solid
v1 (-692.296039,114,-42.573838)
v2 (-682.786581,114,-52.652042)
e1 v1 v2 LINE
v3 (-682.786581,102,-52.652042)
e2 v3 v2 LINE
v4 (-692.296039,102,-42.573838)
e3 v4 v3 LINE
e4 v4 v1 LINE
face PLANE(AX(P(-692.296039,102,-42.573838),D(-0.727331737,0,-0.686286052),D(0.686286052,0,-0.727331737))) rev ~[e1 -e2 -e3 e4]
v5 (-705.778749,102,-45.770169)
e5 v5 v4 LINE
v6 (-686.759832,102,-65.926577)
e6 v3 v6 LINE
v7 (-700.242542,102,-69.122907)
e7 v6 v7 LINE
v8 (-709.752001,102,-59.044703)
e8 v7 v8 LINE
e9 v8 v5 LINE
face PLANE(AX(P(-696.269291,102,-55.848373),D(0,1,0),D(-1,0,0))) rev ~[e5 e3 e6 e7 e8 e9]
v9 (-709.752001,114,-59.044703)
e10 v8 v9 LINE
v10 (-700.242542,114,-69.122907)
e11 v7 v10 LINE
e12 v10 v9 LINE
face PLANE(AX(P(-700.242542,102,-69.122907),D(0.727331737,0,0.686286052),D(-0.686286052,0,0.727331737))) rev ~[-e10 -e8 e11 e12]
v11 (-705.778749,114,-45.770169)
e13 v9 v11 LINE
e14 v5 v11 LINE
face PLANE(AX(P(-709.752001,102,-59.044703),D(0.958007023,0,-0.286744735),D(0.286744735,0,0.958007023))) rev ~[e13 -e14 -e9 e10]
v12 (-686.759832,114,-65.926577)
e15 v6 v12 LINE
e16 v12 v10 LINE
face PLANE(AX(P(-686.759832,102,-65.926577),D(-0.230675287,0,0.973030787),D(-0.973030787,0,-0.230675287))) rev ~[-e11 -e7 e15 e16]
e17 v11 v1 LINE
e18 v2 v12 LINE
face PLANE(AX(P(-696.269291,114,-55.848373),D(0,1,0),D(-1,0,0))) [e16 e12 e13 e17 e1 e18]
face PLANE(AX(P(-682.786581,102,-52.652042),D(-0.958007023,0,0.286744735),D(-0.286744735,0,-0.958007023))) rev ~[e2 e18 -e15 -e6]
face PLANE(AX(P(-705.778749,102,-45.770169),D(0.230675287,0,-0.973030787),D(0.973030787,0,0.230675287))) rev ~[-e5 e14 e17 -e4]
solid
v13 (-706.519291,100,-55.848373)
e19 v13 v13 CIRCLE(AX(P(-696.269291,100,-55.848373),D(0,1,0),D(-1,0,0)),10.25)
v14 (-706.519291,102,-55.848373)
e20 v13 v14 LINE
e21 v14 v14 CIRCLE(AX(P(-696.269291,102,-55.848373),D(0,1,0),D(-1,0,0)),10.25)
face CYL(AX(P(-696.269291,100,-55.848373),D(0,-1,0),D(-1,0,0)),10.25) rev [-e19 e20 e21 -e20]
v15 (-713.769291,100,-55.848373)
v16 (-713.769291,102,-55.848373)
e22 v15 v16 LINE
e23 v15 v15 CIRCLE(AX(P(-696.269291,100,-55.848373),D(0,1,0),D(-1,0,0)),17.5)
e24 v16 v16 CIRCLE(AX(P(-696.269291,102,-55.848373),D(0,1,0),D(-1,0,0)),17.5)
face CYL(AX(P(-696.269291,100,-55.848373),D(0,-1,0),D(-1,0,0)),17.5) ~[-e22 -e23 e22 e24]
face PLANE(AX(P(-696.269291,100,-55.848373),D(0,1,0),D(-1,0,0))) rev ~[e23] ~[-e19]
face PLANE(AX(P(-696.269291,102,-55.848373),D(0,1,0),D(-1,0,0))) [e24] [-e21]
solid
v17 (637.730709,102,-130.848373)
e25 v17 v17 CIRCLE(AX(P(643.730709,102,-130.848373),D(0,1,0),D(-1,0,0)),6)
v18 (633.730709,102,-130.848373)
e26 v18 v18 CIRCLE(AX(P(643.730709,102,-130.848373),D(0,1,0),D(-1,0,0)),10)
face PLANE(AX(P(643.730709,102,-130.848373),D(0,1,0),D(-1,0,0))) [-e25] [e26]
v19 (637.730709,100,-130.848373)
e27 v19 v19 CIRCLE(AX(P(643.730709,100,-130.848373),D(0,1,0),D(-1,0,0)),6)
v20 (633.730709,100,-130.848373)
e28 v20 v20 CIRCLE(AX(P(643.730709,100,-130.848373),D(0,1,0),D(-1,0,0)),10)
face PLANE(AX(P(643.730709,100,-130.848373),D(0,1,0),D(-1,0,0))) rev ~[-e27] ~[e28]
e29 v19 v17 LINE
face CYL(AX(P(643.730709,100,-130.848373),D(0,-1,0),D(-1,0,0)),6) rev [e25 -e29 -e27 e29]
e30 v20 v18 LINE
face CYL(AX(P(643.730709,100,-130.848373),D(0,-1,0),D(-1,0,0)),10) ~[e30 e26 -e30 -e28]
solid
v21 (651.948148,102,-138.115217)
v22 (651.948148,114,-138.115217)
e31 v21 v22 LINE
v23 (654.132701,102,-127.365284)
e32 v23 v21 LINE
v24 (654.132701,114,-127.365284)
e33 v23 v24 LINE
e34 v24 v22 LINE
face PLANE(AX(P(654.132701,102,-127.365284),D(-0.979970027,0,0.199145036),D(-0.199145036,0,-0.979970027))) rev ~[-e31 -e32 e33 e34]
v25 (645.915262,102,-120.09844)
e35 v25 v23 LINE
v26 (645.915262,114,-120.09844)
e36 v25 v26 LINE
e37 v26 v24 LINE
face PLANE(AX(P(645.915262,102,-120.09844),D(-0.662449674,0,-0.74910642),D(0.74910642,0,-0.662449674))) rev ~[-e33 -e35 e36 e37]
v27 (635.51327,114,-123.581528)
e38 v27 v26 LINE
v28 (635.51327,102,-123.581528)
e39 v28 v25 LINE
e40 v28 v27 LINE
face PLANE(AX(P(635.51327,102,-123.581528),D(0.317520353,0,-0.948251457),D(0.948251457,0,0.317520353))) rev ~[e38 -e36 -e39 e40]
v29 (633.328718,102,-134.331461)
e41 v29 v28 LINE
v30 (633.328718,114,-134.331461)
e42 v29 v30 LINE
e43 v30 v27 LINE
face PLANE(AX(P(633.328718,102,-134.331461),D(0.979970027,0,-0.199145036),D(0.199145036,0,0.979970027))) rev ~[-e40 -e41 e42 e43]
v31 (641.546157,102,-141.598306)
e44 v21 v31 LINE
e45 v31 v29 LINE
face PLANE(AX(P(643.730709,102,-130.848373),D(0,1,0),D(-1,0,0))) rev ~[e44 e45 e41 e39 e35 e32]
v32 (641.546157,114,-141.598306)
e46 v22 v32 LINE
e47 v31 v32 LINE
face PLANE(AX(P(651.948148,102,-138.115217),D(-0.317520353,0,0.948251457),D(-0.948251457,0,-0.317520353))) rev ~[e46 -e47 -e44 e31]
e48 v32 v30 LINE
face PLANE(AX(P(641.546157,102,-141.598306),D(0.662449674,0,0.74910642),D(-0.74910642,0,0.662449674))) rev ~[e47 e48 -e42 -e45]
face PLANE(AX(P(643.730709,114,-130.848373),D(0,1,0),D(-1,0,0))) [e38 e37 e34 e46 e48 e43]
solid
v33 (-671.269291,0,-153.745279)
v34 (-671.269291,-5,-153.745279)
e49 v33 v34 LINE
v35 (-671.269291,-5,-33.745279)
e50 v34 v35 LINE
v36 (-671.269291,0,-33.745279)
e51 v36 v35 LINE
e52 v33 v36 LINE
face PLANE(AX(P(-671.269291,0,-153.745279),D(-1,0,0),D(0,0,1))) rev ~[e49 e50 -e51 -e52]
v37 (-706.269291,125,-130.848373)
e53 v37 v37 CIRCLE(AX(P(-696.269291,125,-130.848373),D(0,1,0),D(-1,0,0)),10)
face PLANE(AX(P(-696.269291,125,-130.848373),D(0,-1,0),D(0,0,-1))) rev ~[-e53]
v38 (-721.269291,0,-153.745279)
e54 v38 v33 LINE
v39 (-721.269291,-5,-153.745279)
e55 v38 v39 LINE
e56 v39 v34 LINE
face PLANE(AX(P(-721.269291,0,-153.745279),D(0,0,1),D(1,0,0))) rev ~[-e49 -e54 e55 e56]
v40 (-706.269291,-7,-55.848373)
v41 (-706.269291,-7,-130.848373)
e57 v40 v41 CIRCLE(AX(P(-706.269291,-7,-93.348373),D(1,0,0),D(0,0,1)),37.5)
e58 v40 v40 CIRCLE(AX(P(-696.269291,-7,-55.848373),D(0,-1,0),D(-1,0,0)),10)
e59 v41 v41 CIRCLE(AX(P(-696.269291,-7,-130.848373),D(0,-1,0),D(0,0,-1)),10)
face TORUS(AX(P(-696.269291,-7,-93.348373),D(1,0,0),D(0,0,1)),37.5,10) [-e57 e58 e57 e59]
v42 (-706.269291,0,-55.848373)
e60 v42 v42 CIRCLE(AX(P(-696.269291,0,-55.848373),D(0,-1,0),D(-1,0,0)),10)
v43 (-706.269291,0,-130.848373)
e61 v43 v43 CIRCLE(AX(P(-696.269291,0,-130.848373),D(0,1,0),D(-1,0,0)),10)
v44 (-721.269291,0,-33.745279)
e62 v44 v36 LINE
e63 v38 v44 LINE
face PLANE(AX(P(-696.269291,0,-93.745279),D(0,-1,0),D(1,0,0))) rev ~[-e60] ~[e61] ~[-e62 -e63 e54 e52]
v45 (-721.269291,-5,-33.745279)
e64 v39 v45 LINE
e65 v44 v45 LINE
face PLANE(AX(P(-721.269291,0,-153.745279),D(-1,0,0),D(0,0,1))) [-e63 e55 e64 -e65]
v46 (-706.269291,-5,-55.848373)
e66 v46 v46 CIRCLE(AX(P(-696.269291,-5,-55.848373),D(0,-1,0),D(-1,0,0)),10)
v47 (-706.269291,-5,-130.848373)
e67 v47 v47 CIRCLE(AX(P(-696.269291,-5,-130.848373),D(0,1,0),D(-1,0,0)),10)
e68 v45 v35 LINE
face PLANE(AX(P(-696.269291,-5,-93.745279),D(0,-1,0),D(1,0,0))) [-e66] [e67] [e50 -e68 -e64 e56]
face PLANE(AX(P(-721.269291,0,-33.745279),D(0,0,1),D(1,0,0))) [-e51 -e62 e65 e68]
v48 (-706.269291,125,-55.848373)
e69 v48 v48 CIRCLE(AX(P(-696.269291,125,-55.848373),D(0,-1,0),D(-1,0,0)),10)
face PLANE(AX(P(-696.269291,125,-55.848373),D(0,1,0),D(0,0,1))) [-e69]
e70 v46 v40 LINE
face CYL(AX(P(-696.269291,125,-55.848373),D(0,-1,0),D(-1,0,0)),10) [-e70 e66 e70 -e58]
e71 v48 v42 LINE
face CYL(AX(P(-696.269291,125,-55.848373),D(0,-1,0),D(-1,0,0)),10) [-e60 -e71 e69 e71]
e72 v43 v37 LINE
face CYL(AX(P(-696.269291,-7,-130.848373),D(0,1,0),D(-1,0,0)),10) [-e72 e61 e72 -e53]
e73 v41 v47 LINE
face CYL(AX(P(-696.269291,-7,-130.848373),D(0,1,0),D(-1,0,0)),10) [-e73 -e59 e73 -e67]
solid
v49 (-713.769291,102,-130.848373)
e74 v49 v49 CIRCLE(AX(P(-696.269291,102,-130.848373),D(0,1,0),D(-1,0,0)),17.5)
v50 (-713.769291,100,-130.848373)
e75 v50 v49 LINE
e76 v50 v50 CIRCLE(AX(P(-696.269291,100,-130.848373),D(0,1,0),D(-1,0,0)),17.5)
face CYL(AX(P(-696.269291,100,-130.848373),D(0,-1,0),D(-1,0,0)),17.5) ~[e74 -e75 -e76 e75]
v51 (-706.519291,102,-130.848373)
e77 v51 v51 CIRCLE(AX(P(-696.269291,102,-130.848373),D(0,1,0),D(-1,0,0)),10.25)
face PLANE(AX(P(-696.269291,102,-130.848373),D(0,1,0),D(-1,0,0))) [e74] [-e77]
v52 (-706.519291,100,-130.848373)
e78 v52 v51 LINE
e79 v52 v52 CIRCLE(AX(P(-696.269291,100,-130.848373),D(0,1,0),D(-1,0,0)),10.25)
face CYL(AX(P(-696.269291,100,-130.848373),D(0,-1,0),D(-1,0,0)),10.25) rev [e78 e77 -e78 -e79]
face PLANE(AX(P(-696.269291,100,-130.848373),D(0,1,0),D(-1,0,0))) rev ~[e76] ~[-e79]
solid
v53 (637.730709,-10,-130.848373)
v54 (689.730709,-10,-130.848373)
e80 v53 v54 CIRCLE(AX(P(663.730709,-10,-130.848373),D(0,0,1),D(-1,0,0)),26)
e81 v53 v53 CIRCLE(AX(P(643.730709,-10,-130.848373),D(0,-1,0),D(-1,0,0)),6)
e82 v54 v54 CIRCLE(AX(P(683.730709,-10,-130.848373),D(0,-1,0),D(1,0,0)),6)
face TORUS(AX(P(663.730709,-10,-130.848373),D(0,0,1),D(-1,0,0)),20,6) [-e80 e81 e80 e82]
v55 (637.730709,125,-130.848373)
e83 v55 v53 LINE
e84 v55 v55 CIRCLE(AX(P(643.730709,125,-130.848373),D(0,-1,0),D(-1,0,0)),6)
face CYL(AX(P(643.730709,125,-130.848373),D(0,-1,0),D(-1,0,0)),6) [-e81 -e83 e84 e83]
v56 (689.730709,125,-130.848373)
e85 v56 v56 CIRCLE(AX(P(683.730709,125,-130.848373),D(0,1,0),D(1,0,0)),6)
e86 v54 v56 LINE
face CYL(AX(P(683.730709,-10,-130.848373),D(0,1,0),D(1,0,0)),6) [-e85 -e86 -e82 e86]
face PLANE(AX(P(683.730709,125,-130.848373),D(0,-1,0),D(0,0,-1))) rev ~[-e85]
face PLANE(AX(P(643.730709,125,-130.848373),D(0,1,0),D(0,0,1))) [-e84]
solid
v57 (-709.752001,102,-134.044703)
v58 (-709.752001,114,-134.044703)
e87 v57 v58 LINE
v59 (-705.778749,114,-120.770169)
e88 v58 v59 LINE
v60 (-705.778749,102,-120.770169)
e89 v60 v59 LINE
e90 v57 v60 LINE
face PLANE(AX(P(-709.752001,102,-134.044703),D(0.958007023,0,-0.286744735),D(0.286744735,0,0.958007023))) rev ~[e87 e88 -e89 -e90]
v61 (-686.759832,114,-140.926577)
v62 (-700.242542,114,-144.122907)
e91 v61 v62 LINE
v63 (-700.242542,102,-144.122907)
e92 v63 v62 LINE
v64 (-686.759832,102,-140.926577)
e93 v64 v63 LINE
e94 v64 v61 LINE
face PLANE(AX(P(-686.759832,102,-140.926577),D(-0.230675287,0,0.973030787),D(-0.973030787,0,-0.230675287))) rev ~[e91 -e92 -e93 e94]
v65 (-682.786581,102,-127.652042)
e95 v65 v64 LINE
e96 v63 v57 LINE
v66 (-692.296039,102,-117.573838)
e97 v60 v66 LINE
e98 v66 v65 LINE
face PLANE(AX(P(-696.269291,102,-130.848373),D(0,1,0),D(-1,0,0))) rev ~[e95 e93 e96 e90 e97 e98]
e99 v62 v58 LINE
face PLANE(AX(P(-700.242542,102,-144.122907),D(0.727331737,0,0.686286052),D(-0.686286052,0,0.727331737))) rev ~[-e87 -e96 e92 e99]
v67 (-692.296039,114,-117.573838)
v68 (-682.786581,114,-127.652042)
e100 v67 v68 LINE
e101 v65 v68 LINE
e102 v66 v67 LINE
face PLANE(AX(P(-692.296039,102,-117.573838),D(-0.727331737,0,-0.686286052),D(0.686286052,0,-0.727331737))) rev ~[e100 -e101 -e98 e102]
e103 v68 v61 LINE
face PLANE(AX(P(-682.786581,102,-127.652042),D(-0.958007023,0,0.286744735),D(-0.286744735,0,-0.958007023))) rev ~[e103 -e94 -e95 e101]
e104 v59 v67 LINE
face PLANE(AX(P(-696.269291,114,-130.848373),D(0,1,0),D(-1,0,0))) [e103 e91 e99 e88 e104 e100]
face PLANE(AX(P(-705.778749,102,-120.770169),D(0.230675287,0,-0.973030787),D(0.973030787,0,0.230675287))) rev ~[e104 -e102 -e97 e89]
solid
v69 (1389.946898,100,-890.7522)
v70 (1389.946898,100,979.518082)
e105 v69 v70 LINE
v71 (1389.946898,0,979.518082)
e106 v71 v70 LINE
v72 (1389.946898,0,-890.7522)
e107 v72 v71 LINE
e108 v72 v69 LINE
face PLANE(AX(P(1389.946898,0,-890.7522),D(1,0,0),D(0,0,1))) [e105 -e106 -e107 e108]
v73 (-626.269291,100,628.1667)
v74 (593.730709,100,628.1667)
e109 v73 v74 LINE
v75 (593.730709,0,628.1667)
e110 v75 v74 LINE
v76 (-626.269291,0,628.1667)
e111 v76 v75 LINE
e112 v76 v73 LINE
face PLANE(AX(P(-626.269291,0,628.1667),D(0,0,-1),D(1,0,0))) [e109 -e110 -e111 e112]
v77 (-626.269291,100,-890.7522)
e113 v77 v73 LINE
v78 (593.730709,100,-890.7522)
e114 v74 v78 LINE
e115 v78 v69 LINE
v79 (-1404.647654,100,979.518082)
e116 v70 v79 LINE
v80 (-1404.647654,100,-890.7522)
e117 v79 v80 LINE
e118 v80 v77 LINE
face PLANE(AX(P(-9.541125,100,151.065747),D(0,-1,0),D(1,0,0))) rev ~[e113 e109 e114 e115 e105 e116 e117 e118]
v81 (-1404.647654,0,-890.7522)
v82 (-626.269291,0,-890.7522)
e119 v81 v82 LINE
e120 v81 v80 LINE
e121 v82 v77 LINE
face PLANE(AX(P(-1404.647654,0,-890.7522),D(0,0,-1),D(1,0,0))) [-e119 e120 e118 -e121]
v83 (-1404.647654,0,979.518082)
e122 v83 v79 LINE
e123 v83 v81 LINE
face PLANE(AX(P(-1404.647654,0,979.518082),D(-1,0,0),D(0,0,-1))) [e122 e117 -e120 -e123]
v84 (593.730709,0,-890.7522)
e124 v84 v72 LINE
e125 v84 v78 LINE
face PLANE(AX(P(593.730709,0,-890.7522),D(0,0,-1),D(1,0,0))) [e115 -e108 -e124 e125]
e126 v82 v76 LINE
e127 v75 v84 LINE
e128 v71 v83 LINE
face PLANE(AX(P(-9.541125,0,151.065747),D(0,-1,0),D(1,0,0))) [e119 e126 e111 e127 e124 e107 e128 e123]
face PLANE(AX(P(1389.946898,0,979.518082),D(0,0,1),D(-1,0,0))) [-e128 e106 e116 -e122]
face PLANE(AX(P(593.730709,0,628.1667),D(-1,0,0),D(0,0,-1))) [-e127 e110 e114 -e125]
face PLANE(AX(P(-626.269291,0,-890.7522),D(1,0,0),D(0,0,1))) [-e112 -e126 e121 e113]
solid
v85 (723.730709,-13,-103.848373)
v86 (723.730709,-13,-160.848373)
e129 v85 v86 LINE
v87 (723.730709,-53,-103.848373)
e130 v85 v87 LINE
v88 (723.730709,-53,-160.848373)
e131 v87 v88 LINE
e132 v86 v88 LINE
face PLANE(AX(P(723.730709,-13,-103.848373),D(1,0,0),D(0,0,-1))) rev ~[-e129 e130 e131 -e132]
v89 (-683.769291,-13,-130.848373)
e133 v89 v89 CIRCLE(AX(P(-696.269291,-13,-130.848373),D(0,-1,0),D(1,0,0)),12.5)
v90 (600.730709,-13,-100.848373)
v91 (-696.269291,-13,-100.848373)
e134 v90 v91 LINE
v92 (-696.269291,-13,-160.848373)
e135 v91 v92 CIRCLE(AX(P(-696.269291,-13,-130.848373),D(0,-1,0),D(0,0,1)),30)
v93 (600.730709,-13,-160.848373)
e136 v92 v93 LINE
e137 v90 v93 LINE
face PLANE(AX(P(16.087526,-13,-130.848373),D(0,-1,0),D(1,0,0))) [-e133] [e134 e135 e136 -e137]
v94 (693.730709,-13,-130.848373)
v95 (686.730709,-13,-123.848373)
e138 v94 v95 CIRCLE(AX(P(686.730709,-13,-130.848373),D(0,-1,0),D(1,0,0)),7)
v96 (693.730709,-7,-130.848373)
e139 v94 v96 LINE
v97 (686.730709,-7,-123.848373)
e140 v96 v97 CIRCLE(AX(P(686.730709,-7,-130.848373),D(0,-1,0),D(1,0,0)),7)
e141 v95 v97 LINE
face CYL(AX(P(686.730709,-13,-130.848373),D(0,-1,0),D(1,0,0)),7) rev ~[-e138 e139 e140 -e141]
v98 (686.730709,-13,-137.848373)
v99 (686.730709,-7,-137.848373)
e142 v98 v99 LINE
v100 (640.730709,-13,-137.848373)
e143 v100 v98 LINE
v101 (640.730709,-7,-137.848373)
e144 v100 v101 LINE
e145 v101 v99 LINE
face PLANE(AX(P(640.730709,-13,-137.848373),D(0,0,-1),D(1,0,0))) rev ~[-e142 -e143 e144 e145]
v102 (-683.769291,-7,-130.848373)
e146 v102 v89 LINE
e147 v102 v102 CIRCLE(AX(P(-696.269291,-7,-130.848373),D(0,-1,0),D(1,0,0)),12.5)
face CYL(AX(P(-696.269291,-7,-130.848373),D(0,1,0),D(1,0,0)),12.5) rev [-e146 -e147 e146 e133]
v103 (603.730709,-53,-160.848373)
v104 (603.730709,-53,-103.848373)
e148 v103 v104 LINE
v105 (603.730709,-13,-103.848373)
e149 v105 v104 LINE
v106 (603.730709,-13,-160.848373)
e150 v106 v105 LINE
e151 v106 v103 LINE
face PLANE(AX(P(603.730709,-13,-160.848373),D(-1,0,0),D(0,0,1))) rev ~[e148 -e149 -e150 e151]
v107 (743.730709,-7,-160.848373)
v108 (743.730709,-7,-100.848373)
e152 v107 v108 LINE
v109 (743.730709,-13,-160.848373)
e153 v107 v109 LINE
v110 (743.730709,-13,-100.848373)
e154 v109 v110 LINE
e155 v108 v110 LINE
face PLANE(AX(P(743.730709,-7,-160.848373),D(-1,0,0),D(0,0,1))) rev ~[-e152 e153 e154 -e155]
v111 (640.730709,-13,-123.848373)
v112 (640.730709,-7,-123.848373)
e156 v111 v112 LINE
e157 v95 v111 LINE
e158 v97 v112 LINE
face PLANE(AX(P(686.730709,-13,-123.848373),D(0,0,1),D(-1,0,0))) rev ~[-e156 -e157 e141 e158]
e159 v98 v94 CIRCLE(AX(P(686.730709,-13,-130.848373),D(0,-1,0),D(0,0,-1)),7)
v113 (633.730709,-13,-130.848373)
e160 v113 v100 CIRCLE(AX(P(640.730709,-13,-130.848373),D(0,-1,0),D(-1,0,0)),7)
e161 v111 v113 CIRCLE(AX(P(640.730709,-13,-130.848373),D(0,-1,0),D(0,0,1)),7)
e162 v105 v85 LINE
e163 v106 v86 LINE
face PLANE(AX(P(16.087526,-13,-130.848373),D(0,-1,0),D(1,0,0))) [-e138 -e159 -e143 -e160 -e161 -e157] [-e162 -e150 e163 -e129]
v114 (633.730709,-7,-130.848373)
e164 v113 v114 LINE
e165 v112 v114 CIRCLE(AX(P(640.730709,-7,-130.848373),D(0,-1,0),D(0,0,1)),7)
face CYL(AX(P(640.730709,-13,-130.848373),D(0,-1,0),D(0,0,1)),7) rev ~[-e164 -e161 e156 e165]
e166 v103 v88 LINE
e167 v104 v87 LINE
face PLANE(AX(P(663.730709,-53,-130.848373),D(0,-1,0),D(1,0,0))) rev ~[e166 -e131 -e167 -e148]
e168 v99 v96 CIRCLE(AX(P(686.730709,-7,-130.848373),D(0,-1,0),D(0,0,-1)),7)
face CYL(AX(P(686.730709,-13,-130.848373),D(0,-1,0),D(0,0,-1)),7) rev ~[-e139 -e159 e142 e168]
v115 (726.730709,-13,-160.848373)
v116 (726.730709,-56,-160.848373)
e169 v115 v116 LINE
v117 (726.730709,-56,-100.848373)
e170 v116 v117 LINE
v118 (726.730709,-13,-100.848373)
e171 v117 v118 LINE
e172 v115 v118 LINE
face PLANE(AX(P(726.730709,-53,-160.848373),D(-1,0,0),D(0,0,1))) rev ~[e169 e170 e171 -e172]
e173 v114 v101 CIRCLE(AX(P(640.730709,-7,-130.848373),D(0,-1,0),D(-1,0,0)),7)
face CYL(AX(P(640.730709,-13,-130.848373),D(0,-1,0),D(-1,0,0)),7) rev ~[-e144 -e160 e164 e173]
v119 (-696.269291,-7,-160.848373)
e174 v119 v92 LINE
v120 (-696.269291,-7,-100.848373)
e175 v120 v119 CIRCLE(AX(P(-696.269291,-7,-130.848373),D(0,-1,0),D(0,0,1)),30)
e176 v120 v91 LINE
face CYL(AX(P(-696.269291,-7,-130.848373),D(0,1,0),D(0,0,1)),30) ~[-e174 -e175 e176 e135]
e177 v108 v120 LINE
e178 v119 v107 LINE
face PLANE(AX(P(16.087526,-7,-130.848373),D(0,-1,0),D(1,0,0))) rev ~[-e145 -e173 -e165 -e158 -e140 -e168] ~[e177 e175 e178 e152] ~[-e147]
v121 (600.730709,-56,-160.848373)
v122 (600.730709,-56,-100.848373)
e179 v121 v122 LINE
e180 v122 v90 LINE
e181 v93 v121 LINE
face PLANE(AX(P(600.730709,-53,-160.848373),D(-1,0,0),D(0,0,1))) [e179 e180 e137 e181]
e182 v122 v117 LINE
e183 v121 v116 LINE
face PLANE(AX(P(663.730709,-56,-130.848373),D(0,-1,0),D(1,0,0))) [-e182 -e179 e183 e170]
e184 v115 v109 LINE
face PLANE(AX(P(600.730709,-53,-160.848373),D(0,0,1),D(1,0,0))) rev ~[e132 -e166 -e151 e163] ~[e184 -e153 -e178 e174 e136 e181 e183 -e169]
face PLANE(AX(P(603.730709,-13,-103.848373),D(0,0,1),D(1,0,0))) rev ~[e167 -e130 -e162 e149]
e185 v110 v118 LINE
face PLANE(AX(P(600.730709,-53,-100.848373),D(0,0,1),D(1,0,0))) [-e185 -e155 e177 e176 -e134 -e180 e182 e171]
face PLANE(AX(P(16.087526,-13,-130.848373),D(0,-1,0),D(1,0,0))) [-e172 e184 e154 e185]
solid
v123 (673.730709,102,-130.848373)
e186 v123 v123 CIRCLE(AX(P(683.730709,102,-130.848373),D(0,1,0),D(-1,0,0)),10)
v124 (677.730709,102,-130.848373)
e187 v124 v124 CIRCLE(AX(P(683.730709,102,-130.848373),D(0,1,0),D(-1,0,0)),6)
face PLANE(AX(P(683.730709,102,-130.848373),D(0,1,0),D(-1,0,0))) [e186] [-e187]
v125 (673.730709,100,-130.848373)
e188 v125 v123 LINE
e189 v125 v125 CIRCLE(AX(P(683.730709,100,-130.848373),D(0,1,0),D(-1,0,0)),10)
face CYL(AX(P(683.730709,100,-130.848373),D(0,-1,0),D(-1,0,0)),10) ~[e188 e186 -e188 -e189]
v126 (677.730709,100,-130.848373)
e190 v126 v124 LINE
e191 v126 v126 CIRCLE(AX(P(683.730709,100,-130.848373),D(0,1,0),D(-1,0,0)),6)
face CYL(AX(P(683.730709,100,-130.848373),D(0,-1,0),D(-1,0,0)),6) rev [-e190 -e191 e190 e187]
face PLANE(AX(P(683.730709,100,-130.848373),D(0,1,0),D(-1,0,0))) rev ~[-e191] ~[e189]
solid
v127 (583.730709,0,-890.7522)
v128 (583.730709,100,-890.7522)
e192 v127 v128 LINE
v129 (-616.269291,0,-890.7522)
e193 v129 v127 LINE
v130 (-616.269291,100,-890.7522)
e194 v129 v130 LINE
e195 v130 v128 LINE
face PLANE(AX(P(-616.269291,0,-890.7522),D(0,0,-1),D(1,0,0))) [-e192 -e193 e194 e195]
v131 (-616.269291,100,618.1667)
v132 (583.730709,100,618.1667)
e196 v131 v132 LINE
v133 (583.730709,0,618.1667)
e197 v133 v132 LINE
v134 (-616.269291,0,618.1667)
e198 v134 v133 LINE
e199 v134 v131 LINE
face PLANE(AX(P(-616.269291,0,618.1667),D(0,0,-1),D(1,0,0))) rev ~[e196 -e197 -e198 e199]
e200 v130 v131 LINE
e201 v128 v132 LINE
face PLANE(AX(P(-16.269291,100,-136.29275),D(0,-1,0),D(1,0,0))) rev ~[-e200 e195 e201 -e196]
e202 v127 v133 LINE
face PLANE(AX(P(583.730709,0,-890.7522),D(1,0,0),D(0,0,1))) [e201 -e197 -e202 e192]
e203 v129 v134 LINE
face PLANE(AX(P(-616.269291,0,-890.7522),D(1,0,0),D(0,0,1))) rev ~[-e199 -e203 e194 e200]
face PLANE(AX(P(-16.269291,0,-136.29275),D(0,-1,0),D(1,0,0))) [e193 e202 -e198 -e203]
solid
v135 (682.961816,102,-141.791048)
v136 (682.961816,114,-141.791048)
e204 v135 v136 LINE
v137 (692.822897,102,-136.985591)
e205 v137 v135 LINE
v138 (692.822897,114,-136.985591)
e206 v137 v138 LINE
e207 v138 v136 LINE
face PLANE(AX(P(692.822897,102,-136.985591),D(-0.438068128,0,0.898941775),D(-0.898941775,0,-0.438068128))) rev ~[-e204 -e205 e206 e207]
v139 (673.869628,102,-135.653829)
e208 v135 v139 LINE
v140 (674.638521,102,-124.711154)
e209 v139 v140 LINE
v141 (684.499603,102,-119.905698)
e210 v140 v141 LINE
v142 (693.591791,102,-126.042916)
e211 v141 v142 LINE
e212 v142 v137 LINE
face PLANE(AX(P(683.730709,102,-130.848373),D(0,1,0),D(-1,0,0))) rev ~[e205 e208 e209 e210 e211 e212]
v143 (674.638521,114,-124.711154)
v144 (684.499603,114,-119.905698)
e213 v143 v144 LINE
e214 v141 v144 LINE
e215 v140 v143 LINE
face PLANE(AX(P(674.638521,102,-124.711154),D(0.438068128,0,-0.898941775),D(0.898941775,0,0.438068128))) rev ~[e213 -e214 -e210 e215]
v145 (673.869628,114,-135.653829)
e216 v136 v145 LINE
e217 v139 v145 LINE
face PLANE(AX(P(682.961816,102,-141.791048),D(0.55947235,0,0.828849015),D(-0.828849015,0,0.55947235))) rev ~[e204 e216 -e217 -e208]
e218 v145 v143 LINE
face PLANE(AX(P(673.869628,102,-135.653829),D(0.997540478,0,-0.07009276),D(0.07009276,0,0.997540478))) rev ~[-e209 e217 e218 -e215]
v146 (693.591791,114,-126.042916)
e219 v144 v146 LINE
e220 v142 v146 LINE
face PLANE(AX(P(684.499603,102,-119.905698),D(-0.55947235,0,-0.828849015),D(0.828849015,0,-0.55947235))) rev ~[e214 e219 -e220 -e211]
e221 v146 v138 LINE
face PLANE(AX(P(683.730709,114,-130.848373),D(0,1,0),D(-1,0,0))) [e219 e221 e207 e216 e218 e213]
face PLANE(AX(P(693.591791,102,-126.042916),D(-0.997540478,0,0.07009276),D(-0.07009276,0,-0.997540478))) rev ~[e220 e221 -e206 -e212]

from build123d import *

# Parameters (mm, degrees)
F1_W      = 1200
F1_H      = 1508.9189000277
F2_DEPTH  = 100
F4_R      = 12.5
F5_DEPTH  = 6
F9_R      = 10
F11_W     = 50
F11_H     = 120
F12_DEPTH = 5
F13_R     = 17.5
F13_R_2   = 10.25
F14_DEPTH = 2
F16_DEPTH = 12
F18_DEPTH = 138.001
F22_R     = 6
F24_R     = 10
F24_R_2   = 6
F25_DEPTH = 2
F27_DEPTH = 12
F29_DEPTH = 40
F30_W     = 126
F30_H     = 60
F31_DEPTH = 3


with BuildPart() as f2:
    # F1 (on Front) → F2 (new body)
    with BuildSketch(Plane.XZ):
        with Locations((-16.2692907102, -136.2927497408)):
            Rectangle(F1_W, F1_H)
    extrude(amount=-F2_DEPTH)


with BuildPart() as f2b:
    # F1 (on Front) → F2, piece 2 (new body)
    with BuildSketch(Plane.XZ):
        Polygon((-626.2692907102, 979.5180817103), (-1404.6476536957, 979.5180817103), (-1404.6476536957, -890.7521997547), (-626.2692907102, -890.7521997547), (-626.2692907102, 628.166700273), (593.7307092898, 628.166700273), (593.7307092898, -890.7521997547), (1389.9468982188, -890.7521997547), (1389.9468982188, 979.5180817103), (593.7307092898, 979.5180817103), align=None)
    extrude(amount=-F2_DEPTH)


with BuildPart() as f5:
    # F4 (on offset) → F5 (new body)
    with BuildSketch(Plane.XZ.offset(7)):
        with BuildLine():
            Line((743.7307092898, -100.8483727276), (-696.2692907102, -100.8483727276))
            ThreePointArc((-696.2692907102, -100.8483727276), (-717.4824941458, -109.635169292), (-726.2692907102, -130.8483727276))
            ThreePointArc((-726.2692907102, -130.8483727276), (-717.4824941458, -152.0615761632), (-696.2692907102, -160.8483727276))
            Line((-696.2692907102, -160.8483727276), (743.7307092898, -160.8483727276))
            Line((743.7307092898, -160.8483727276), (743.7307092898, -100.8483727276))
        make_face()
        with Locations((-696.2692907102, -130.8483727276)):
            Circle(F4_R, mode=Mode.SUBTRACT)
    extrude(amount=F5_DEPTH)

    # F17 (on face) → F18 (cut, through all)
    with BuildSketch(Plane.XZ.offset(13)):
        with BuildLine():
            Line((686.7307092898, -123.8483727276), (640.7307092898, -123.8483727276))
            ThreePointArc((640.7307092898, -123.8483727276), (635.7809618215, -125.8986252593), (633.7307092898, -130.8483727276))
            ThreePointArc((633.7307092898, -130.8483727276), (635.7809618215, -135.7981201959), (640.7307092898, -137.8483727276))
            Line((640.7307092898, -137.8483727276), (686.7307092898, -137.8483727276))
            ThreePointArc((686.7307092898, -137.8483727276), (691.6804567581, -135.7981201959), (693.7307092898, -130.8483727276))
            ThreePointArc((693.7307092898, -130.8483727276), (691.6804567581, -125.8986252593), (686.7307092898, -123.8483727276))
        make_face()
    extrude(amount=-F18_DEPTH, mode=Mode.SUBTRACT)

    # F28 (on face) → F29 (join)
    with BuildSketch(Plane.XZ.offset(13)):
        Polygon((600.7307092898, -160.8483727276), (603.7307092898, -160.8483727276), (603.7307092898, -103.8483727276), (723.7307092898, -103.8483727276), (723.7307092898, -160.8483727276), (726.7307092898, -160.8483727276), (726.7307092898, -100.8483727276), (600.7307092898, -100.8483727276), align=None)
    extrude(amount=F29_DEPTH)

    # F30 (on face) → F31 (join)
    with BuildSketch(Plane.XZ.offset(53)):
        with Locations((663.7307092898, -130.8483727276)):
            Rectangle(F30_W, F30_H)
    extrude(amount=F31_DEPTH)


with BuildPart() as f10:
    # F10: sweep along a path in F7
    with BuildLine(Plane(origin=(-696.2692907102, 0, 0), x_dir=(0, -1, 0), z_dir=(-1, 0, 0))) as f10_path:
        Line((-125, -55.8483727276), (7, -55.8483727276))
        ThreePointArc((7, -55.8483727276), (44.5, -93.3483727276), (7, -130.8483727276))
        Line((7, -130.8483727276), (-125, -130.8483727276))
    # F9 (on line) → F10 (sweep)
    with BuildSketch(Plane(origin=(0, 125, 0), x_dir=(-1, 0, 0), z_dir=(0, 1, 0))):
        with Locations((696.2692907102, -55.8483727276)):
            Circle(F9_R)
    sweep(path=f10_path.line)

    # F11 (on face) → F12 (join)
    with BuildSketch(Plane.XZ):
        with Locations((-696.2692907102, -93.7452787161)):
            Rectangle(F11_W, F11_H)
    extrude(amount=F12_DEPTH)


with BuildPart() as f14:
    # F13 (on face) → F14 (new body)
    with BuildSketch(Plane(origin=(0, 100, 0), x_dir=(-1, 0, 0), z_dir=(0, 1, 0))):
        with Locations((696.2692907102, -55.8483727276)):
            Circle(F13_R)
        with Locations((696.2692907102, -55.8483727276)):
            Circle(F13_R_2, mode=Mode.SUBTRACT)
    extrude(amount=F14_DEPTH)


with BuildPart() as f14b:
    # F13 (on face) → F14, piece 2 (new body)
    with BuildSketch(Plane(origin=(0, 100, 0), x_dir=(-1, 0, 0), z_dir=(0, 1, 0))):
        with Locations((696.2692907102, -130.8483727276)):
            Circle(F13_R)
        with Locations((696.2692907102, -130.8483727276)):
            Circle(F13_R_2, mode=Mode.SUBTRACT)
    extrude(amount=F14_DEPTH)


with BuildPart() as f16:
    # F15 (on face) → F16 (new body)
    with BuildSketch(Plane(origin=(0, 102, 0), x_dir=(-1, 0, 0), z_dir=(0, 1, 0))):
        Polygon((700.2425423067, -69.122907437), (709.7520007902, -59.0447032641), (705.7787491936, -45.7701685547), (692.2960391136, -42.5738380183), (682.7865806302, -52.6520421912), (686.7598322267, -65.9265769006), align=None)
    extrude(amount=F16_DEPTH)


with BuildPart() as f16b:
    # F15 (on face) → F16, piece 2 (new body)
    with BuildSketch(Plane(origin=(0, 102, 0), x_dir=(-1, 0, 0), z_dir=(0, 1, 0))):
        Polygon((700.2425423067, -144.122907437), (709.7520007902, -134.0447032641), (705.7787491936, -120.7701685547), (692.2960391136, -117.5738380183), (682.7865806302, -127.6520421912), (686.7598322267, -140.9265769006), align=None)
    extrude(amount=F16_DEPTH)


with BuildPart() as f23:
    # F23: sweep along a path in F20
    with BuildLine(Plane.XY.offset(-130.8483727276)) as f23_path:
        Line((643.7307092898, 125), (643.7307092898, -10))
        ThreePointArc((643.7307092898, -10), (663.7307092898, -30), (683.7307092898, -10))
        Line((683.7307092898, -10), (683.7307092898, 125))
    # F22 (on line) → F23 (sweep)
    with BuildSketch(Plane(origin=(0, 125, 0), x_dir=(-1, 0, 0), z_dir=(0, 1, 0))):
        with Locations((-643.7307092898, -130.8483727276)):
            Circle(F22_R)
    sweep(path=f23_path.line)


with BuildPart() as f25:
    # F24 (on face) → F25 (new body)
    with BuildSketch(Plane(origin=(0, 100, 0), x_dir=(-1, 0, 0), z_dir=(0, 1, 0))):
        with Locations((-643.7307092898, -130.8483727276)):
            Circle(F24_R)
        with Locations((-643.7307092898, -130.8483727276)):
            Circle(F24_R_2, mode=Mode.SUBTRACT)
    extrude(amount=F25_DEPTH)


with BuildPart() as f25b:
    # F24 (on face) → F25, piece 2 (new body)
    with BuildSketch(Plane(origin=(0, 100, 0), x_dir=(-1, 0, 0), z_dir=(0, 1, 0))):
        with Locations((-683.7307092898, -130.8483727276)):
            Circle(F24_R)
        with Locations((-683.7307092898, -130.8483727276)):
            Circle(F24_R_2, mode=Mode.SUBTRACT)
    extrude(amount=F25_DEPTH)


with BuildPart() as f27:
    # F26 (on face) → F27 (new body)
    with BuildSketch(Plane(origin=(0, 102, 0), x_dir=(-1, 0, 0), z_dir=(0, 1, 0))):
        Polygon((-645.915261656, -120.0984395049), (-654.1327007328, -127.3652839613), (-651.9481483666, -138.115217184), (-641.5461569237, -141.5983059503), (-633.3287178469, -134.331461494), (-635.5132702131, -123.5815282713), align=None)
    extrude(amount=F27_DEPTH)


with BuildPart() as f27b:
    # F26 (on face) → F27, piece 2 (new body)
    with BuildSketch(Plane(origin=(0, 102, 0), x_dir=(-1, 0, 0), z_dir=(0, 1, 0))):
        Polygon((-684.4996026959, -119.9056977227), (-693.5917905325, -126.0429164476), (-692.8228971264, -136.9855914525), (-682.9618158838, -141.7910477326), (-673.8696280472, -135.6538290076), (-674.6385214532, -124.7111540027), align=None)
    extrude(amount=F27_DEPTH)


solid = Compound([f2.part, f2b.part, f5.part, f10.part, f14.part, f14b.part, f16.part, f16b.part, f23.part, f25.part, f25b.part, f27.part, f27b.part])
